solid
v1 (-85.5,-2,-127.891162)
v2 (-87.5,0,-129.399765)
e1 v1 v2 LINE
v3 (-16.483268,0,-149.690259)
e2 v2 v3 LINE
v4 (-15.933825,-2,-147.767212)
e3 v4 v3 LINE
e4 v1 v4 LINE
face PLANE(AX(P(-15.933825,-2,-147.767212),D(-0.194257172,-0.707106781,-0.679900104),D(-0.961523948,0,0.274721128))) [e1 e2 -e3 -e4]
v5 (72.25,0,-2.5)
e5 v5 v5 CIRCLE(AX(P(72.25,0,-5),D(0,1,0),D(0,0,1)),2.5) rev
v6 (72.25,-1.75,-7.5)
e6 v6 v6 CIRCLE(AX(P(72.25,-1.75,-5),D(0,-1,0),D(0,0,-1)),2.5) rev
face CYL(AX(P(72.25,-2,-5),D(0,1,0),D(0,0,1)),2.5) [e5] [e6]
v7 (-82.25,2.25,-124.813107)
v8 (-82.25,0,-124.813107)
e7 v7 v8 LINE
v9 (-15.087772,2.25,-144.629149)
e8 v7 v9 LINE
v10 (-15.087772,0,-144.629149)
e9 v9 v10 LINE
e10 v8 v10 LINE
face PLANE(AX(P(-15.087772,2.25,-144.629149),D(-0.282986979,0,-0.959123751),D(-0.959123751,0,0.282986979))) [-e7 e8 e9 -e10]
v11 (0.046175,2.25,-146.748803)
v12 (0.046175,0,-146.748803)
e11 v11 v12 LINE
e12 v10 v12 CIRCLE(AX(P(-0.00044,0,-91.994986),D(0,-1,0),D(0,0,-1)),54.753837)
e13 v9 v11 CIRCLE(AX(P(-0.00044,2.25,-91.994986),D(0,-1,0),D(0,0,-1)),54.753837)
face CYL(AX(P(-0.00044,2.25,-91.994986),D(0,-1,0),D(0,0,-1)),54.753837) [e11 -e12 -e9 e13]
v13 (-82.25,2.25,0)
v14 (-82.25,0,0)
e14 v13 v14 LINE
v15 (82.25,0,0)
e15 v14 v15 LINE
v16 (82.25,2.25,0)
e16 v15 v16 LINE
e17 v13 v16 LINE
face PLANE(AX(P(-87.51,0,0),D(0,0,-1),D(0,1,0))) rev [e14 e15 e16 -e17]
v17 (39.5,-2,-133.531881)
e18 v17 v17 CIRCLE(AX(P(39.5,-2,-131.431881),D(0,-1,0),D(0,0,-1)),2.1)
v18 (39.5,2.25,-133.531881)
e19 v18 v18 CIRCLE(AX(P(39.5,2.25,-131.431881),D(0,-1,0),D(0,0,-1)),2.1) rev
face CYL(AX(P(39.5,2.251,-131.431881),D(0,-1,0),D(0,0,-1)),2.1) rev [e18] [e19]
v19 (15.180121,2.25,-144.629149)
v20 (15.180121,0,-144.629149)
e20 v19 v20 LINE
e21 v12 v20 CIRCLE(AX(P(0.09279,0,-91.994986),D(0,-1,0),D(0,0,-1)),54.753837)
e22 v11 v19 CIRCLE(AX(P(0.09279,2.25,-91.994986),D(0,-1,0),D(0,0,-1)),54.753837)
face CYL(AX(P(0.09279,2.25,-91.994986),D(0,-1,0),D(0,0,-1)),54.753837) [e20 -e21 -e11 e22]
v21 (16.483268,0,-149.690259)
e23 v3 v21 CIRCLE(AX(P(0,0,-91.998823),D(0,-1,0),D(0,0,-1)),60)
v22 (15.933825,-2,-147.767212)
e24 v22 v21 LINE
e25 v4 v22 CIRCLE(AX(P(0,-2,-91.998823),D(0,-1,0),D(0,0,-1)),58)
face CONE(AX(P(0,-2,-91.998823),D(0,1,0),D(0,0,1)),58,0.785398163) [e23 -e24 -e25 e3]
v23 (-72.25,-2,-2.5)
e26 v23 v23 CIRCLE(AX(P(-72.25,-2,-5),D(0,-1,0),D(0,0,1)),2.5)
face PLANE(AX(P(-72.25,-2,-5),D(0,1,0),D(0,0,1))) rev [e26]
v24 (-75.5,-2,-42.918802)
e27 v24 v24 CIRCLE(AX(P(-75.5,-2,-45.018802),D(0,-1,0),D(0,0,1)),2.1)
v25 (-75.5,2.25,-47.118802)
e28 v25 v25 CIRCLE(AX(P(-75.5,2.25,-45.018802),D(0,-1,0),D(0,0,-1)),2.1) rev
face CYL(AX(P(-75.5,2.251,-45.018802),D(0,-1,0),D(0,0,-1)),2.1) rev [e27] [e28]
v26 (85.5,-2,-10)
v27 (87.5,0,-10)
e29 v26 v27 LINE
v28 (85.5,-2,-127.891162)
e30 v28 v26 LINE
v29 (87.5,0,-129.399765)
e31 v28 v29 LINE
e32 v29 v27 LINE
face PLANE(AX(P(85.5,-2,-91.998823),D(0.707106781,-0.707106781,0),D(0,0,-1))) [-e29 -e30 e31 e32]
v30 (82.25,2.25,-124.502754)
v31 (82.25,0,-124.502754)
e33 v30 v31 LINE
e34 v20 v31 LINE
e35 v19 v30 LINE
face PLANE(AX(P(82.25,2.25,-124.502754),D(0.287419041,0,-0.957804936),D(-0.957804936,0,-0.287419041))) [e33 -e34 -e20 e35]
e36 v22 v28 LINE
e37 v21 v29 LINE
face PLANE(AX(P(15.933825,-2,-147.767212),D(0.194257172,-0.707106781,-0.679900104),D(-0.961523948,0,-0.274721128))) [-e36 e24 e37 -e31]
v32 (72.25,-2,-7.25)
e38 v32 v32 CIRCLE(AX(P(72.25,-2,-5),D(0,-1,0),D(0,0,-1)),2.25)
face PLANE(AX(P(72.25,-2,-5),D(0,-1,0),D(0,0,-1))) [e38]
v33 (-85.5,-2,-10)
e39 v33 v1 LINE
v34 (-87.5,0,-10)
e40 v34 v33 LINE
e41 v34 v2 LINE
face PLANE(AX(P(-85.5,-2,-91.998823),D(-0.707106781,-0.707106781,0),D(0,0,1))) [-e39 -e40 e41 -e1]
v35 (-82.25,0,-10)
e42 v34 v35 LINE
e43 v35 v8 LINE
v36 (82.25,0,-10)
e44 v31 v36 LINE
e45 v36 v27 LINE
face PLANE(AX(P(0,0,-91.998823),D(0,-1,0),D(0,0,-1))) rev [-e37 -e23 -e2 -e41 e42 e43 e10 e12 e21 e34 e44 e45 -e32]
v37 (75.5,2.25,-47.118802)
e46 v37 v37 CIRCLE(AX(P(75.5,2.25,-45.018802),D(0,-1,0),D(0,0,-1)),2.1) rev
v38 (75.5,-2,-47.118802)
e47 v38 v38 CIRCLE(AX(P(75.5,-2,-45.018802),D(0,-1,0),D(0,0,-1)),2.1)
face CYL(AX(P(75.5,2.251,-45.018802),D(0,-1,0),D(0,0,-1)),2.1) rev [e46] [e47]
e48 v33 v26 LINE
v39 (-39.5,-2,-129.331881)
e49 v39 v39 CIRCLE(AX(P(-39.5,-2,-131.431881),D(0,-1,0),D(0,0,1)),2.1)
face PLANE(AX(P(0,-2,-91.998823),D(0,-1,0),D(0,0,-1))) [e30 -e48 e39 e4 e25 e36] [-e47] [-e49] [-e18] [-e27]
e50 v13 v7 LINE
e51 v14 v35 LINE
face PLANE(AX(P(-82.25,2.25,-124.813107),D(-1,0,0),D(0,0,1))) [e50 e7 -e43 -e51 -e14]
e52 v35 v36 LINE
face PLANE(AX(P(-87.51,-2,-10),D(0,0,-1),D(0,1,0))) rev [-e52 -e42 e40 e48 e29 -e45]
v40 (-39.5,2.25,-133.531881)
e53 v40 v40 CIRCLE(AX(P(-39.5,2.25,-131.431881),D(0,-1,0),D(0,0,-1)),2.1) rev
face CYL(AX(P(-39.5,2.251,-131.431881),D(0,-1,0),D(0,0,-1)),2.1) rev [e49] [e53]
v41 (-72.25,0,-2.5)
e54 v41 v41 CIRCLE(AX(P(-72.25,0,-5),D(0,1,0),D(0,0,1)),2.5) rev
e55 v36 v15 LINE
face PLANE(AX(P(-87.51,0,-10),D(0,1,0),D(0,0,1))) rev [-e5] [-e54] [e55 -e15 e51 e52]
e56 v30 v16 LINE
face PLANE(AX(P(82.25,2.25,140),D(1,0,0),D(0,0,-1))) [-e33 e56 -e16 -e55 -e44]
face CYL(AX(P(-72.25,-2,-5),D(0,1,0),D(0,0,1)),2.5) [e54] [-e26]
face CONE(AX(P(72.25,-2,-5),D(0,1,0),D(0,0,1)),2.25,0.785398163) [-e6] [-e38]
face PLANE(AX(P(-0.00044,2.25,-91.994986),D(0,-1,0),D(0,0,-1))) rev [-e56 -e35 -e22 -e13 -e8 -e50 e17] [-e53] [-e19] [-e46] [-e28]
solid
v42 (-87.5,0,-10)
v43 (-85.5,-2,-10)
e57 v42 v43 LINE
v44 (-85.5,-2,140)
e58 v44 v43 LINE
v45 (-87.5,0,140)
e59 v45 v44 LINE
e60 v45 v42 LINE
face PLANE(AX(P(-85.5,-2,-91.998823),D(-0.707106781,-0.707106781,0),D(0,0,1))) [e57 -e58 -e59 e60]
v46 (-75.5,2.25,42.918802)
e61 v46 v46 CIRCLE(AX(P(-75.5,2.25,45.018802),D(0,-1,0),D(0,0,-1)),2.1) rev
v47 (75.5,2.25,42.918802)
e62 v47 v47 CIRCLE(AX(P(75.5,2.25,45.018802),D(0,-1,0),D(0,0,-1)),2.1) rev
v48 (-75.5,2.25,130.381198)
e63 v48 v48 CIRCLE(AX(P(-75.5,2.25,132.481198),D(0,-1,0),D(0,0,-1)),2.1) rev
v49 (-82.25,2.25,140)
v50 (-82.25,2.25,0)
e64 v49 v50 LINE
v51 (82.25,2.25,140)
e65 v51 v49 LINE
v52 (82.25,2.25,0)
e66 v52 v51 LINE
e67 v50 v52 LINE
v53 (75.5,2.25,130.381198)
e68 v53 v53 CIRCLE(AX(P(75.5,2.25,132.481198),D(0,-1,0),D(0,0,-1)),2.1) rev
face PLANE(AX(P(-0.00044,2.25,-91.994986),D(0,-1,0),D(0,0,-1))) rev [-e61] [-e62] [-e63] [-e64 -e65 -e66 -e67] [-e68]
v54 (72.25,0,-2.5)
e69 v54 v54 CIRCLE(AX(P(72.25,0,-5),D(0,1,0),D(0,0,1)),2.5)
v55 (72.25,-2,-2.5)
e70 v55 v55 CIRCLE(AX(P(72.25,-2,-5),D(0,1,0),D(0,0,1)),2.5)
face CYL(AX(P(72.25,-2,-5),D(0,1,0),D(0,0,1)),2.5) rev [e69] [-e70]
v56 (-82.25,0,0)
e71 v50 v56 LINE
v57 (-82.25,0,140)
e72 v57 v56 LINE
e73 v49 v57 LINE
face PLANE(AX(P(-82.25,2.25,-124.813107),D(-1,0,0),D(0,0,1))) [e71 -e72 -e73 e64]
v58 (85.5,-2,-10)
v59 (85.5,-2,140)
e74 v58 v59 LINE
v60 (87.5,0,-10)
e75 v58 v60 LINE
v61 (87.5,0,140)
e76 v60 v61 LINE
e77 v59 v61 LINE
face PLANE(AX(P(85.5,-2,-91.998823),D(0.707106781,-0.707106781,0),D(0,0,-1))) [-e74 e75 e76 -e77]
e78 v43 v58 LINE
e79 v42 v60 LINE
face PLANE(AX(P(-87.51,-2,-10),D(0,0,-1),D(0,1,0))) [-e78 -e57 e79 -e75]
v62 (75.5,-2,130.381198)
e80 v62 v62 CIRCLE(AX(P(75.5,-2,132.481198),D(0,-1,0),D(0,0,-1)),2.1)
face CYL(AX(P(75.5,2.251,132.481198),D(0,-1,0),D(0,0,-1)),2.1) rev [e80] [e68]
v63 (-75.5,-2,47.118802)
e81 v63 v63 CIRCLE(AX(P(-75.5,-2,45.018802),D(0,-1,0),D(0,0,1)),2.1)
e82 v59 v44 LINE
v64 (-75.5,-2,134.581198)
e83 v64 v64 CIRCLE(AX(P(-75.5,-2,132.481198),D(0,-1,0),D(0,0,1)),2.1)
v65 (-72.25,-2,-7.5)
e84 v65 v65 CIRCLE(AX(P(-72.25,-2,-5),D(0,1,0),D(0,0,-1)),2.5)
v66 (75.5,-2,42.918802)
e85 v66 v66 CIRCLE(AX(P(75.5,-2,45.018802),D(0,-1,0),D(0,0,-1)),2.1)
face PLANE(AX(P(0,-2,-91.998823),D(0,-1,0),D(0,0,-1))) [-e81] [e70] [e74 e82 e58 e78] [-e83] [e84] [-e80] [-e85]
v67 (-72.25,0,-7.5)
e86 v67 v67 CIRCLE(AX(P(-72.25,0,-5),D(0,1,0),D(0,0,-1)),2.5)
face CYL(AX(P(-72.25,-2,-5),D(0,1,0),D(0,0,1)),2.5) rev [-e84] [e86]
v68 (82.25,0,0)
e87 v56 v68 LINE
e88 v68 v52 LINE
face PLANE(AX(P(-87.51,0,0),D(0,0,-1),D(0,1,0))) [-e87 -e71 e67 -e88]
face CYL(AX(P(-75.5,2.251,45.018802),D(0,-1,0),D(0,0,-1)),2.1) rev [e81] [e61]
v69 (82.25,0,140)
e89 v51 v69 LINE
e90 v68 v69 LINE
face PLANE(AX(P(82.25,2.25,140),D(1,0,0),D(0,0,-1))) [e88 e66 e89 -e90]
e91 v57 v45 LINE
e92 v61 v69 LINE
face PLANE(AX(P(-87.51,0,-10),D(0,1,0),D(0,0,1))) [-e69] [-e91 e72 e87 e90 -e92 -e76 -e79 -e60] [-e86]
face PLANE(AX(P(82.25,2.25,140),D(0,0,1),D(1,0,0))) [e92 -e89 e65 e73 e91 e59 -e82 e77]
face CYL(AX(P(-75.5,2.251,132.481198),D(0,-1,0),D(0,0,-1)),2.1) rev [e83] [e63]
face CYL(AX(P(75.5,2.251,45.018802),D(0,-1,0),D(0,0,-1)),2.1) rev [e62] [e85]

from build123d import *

# Parameters (mm, degrees)
BOSS_EXTRUDE1_DEPTH    = 2.25
BOSS_EXTRUDE2_DEPTH    = 2
CHAMFER1_SIZE          = 2
CUT_EXTRUDE1_REACH     = 177.436
SKETCH5_R              = 2.1
SPLIT1_SURFACE_1_BACK  = 341.45
SPLIT1_SURFACE_1_DEPTH = 682.9
SPLIT1_SURFACE_2_BACK  = 341.45
SPLIT1_SURFACE_2_DEPTH = 682.9
SKETCH7_R              = 2.5
BOSS_EXTRUDE3_DEPTH    = 2
CHAMFER2_SIZE          = 0.25
SKETCH9_R              = 2.5
CUT_EXTRUDE2_DEPTH     = 2


with BuildPart() as part:
    # Sketch3 → Boss-Extrude1 (new body)
    with BuildSketch(Plane.XZ):
        with BuildLine():
            Line((82.25, 140), (82.25, -124.502754064))
            Line((82.25, -124.502754064), (15.180121042, -144.629148882))
            ThreePointArc((15.180121042, -144.629148882), (7.687460253, -146.219552794), (0.046174732, -146.748803111))
            ThreePointArc((0.046174732, -146.748803111), (-7.595110788, -146.219552794), (-15.087771577, -144.629148882))
            Line((-15.087771577, -144.629148882), (-82.25, -124.813107271))
            Line((-82.25, -124.813107271), (-82.25, 140))
            Line((-82.25, 140), (82.25, 140))
        make_face()
    extrude(amount=-BOSS_EXTRUDE1_DEPTH)

    # Sketch4 → Boss-Extrude2 (add)
    with BuildSketch(Plane.XZ):
        with BuildLine():
            Line((87.5, 140), (-87.5, 140))
            Line((-87.5, 140), (-87.5, -129.399764523))
            Line((-87.5, -129.399764523), (-16.483267674, -149.690259473))
            ThreePointArc((-16.483267674, -149.690259473), (0, -151.998822615), (16.483267674, -149.690259473))
            Line((16.483267674, -149.690259473), (87.5, -129.399764523))
            Line((87.5, -129.399764523), (87.5, 140))
        make_face()
    extrude(amount=BOSS_EXTRUDE2_DEPTH)

    # Chamfer1
    chamfer1_edges = [part.edges().sort_by_distance(p)[0] for p in [
        (87.5, -2, 5.300117739),
        (51.991633837, -2, -139.545011998),
        (0, -2, -151.998822615),
        (-51.991633837, -2, -139.545011998),
        (-87.5, -2, 5.300117739),
    ]]
    chamfer(chamfer1_edges, length=CHAMFER1_SIZE - 0.0001)  # a hair under: the kernel refuses the full size

    # Sketch5 → Cut-Extrude1 (cut, up to next)
    with BuildSketch(Plane.XZ.offset(2), mode=Mode.PRIVATE) as cut_extrude1_sk1:
        with Locations(Location((39.5, -131.431881025, 0), (0, 0, 270))):
            Circle(SKETCH5_R)
    cut_extrude1_tool1 = extrude(cut_extrude1_sk1.sketch, amount=-CUT_EXTRUDE1_REACH, mode=Mode.PRIVATE) & part.part
    # Sketch5 → Cut-Extrude1 (cut, up to next)
    with BuildSketch(Plane.XZ.offset(2), mode=Mode.PRIVATE) as cut_extrude1_sk2:
        with Locations(Location((75.5, -45.018802154, 0), (0, 0, 270))):
            Circle(SKETCH5_R)
    cut_extrude1_tool2 = extrude(cut_extrude1_sk2.sketch, amount=-CUT_EXTRUDE1_REACH, mode=Mode.PRIVATE) & part.part
    # Sketch5 → Cut-Extrude1 (cut, up to next)
    with BuildSketch(Plane.XZ.offset(2), mode=Mode.PRIVATE) as cut_extrude1_sk3:
        with Locations(Location((75.5, 45.018802154, 0), (0, 0, 270))):
            Circle(SKETCH5_R)
    cut_extrude1_tool3 = extrude(cut_extrude1_sk3.sketch, amount=-CUT_EXTRUDE1_REACH, mode=Mode.PRIVATE) & part.part
    # Sketch5 → Cut-Extrude1 (cut, up to next)
    with BuildSketch(Plane.XZ.offset(2), mode=Mode.PRIVATE) as cut_extrude1_sk4:
        with Locations(Location((75.5, 132.481197846, 0), (0, 0, 270))):
            Circle(SKETCH5_R)
    cut_extrude1_tool4 = extrude(cut_extrude1_sk4.sketch, amount=-CUT_EXTRUDE1_REACH, mode=Mode.PRIVATE) & part.part
    # Sketch5 → Cut-Extrude1 (cut, up to next)
    with BuildSketch(Plane.XZ.offset(2), mode=Mode.PRIVATE) as cut_extrude1_sk5:
        with Locations(Location((-75.5, 132.481197846, 0), (0, 0, 270))):
            Circle(SKETCH5_R)
    cut_extrude1_tool5 = extrude(cut_extrude1_sk5.sketch, amount=-CUT_EXTRUDE1_REACH, mode=Mode.PRIVATE) & part.part
    # Sketch5 → Cut-Extrude1 (cut, up to next)
    with BuildSketch(Plane.XZ.offset(2), mode=Mode.PRIVATE) as cut_extrude1_sk6:
        with Locations(Location((-75.5, 45.018802154, 0), (0, 0, 270))):
            Circle(SKETCH5_R)
    cut_extrude1_tool6 = extrude(cut_extrude1_sk6.sketch, amount=-CUT_EXTRUDE1_REACH, mode=Mode.PRIVATE) & part.part
    # Sketch5 → Cut-Extrude1 (cut, up to next)
    with BuildSketch(Plane.XZ.offset(2), mode=Mode.PRIVATE) as cut_extrude1_sk7:
        with Locations(Location((-75.5, -45.018802154, 0), (0, 0, 270))):
            Circle(SKETCH5_R)
    cut_extrude1_tool7 = extrude(cut_extrude1_sk7.sketch, amount=-CUT_EXTRUDE1_REACH, mode=Mode.PRIVATE) & part.part
    # Sketch5 → Cut-Extrude1 (cut, up to next)
    with BuildSketch(Plane.XZ.offset(2), mode=Mode.PRIVATE) as cut_extrude1_sk8:
        with Locations(Location((-39.5, -131.431881025, 0), (0, 0, 270))):
            Circle(SKETCH5_R)
    cut_extrude1_tool8 = extrude(cut_extrude1_sk8.sketch, amount=-CUT_EXTRUDE1_REACH, mode=Mode.PRIVATE) & part.part
    add(cut_extrude1_tool1.solids().sort_by_distance((39.5, -2, -131.431881))[0], mode=Mode.SUBTRACT)
    add(cut_extrude1_tool2.solids().sort_by_distance((75.5, -2, -45.018802))[0], mode=Mode.SUBTRACT)
    add(cut_extrude1_tool3.solids().sort_by_distance((75.5, -2, 45.018802))[0], mode=Mode.SUBTRACT)
    add(cut_extrude1_tool4.solids().sort_by_distance((75.5, -2, 132.481198))[0], mode=Mode.SUBTRACT)
    add(cut_extrude1_tool5.solids().sort_by_distance((-75.5, -2, 132.481198))[0], mode=Mode.SUBTRACT)
    add(cut_extrude1_tool6.solids().sort_by_distance((-75.5, -2, 45.018802))[0], mode=Mode.SUBTRACT)
    add(cut_extrude1_tool7.solids().sort_by_distance((-75.5, -2, -45.018802))[0], mode=Mode.SUBTRACT)
    add(cut_extrude1_tool8.solids().sort_by_distance((-39.5, -2, -131.431881))[0], mode=Mode.SUBTRACT)


with BuildPart() as body_2:
    # Split1: the piece behind the surface
    add(part.part)
    # Split1 surface: a surface, the sketch's curves swept straight by 682.9 mm
    with BuildLine(Plane(origin=(0, 0, 0), x_dir=(0, 0, -1), z_dir=(1, 0, 0)).offset(-SPLIT1_SURFACE_1_BACK), mode=Mode.PRIVATE) as split1_surface_1_path:
        Line((10, -2), (10, 0))
        Line((10, 0), (0, 0))
        Line((0, 0), (0, 2.25))
    split1_surface_1 = Shell.extrude(split1_surface_1_path.wire(), (1 * SPLIT1_SURFACE_1_DEPTH, 0 * SPLIT1_SURFACE_1_DEPTH, 0 * SPLIT1_SURFACE_1_DEPTH))
    split(bisect_by=split1_surface_1, keep=Keep.BOTTOM)

    # Sketch7 → Boss-Extrude3 (add)
    with BuildSketch(Plane.XZ):
        with Locations(Location((72.25, -5, 0), (0, 0, 90))):
            Circle(SKETCH7_R)
        with Locations(Location((-72.25, -5, 0), (0, 0, 90))):
            Circle(SKETCH7_R)
    extrude(amount=BOSS_EXTRUDE3_DEPTH)

    # Chamfer2
    chamfer2_edges = [body_2.edges().sort_by_distance(p)[0] for p in [
        (72.25, -2, -7.5),
    ]]
    chamfer(chamfer2_edges, length=CHAMFER2_SIZE)


with BuildPart() as part_1:
    add(part.part)

    # Split1: split by a surface, the side it looks to stays
    # Split1 surface: a surface, the sketch's curves swept straight by 682.9 mm
    with BuildLine(Plane(origin=(0, 0, 0), x_dir=(0, 0, -1), z_dir=(1, 0, 0)).offset(-SPLIT1_SURFACE_2_BACK), mode=Mode.PRIVATE) as split1_surface_2_path:
        Line((10, -2), (10, 0))
        Line((10, 0), (0, 0))
        Line((0, 0), (0, 2.25))
    split1_surface_2 = Shell.extrude(split1_surface_2_path.wire(), (1 * SPLIT1_SURFACE_2_DEPTH, 0 * SPLIT1_SURFACE_2_DEPTH, 0 * SPLIT1_SURFACE_2_DEPTH))
    split(bisect_by=split1_surface_2, keep=Keep.TOP)

    # Sketch9 → Cut-Extrude2 (cut)
    with BuildSketch(Plane(origin=(0, 0, 0), x_dir=(1, 0, 0), z_dir=(0, 1, 0))):
        with Locations(Location((72.25, 5, 0), (0, 0, 270))):
            Circle(SKETCH9_R)
        with Locations(Location((-72.25, 5, 0), (0, 0, 90))):
            Circle(SKETCH9_R)
    extrude(amount=-CUT_EXTRUDE2_DEPTH, mode=Mode.SUBTRACT)


solid = Compound([body_2.part, part_1.part])
